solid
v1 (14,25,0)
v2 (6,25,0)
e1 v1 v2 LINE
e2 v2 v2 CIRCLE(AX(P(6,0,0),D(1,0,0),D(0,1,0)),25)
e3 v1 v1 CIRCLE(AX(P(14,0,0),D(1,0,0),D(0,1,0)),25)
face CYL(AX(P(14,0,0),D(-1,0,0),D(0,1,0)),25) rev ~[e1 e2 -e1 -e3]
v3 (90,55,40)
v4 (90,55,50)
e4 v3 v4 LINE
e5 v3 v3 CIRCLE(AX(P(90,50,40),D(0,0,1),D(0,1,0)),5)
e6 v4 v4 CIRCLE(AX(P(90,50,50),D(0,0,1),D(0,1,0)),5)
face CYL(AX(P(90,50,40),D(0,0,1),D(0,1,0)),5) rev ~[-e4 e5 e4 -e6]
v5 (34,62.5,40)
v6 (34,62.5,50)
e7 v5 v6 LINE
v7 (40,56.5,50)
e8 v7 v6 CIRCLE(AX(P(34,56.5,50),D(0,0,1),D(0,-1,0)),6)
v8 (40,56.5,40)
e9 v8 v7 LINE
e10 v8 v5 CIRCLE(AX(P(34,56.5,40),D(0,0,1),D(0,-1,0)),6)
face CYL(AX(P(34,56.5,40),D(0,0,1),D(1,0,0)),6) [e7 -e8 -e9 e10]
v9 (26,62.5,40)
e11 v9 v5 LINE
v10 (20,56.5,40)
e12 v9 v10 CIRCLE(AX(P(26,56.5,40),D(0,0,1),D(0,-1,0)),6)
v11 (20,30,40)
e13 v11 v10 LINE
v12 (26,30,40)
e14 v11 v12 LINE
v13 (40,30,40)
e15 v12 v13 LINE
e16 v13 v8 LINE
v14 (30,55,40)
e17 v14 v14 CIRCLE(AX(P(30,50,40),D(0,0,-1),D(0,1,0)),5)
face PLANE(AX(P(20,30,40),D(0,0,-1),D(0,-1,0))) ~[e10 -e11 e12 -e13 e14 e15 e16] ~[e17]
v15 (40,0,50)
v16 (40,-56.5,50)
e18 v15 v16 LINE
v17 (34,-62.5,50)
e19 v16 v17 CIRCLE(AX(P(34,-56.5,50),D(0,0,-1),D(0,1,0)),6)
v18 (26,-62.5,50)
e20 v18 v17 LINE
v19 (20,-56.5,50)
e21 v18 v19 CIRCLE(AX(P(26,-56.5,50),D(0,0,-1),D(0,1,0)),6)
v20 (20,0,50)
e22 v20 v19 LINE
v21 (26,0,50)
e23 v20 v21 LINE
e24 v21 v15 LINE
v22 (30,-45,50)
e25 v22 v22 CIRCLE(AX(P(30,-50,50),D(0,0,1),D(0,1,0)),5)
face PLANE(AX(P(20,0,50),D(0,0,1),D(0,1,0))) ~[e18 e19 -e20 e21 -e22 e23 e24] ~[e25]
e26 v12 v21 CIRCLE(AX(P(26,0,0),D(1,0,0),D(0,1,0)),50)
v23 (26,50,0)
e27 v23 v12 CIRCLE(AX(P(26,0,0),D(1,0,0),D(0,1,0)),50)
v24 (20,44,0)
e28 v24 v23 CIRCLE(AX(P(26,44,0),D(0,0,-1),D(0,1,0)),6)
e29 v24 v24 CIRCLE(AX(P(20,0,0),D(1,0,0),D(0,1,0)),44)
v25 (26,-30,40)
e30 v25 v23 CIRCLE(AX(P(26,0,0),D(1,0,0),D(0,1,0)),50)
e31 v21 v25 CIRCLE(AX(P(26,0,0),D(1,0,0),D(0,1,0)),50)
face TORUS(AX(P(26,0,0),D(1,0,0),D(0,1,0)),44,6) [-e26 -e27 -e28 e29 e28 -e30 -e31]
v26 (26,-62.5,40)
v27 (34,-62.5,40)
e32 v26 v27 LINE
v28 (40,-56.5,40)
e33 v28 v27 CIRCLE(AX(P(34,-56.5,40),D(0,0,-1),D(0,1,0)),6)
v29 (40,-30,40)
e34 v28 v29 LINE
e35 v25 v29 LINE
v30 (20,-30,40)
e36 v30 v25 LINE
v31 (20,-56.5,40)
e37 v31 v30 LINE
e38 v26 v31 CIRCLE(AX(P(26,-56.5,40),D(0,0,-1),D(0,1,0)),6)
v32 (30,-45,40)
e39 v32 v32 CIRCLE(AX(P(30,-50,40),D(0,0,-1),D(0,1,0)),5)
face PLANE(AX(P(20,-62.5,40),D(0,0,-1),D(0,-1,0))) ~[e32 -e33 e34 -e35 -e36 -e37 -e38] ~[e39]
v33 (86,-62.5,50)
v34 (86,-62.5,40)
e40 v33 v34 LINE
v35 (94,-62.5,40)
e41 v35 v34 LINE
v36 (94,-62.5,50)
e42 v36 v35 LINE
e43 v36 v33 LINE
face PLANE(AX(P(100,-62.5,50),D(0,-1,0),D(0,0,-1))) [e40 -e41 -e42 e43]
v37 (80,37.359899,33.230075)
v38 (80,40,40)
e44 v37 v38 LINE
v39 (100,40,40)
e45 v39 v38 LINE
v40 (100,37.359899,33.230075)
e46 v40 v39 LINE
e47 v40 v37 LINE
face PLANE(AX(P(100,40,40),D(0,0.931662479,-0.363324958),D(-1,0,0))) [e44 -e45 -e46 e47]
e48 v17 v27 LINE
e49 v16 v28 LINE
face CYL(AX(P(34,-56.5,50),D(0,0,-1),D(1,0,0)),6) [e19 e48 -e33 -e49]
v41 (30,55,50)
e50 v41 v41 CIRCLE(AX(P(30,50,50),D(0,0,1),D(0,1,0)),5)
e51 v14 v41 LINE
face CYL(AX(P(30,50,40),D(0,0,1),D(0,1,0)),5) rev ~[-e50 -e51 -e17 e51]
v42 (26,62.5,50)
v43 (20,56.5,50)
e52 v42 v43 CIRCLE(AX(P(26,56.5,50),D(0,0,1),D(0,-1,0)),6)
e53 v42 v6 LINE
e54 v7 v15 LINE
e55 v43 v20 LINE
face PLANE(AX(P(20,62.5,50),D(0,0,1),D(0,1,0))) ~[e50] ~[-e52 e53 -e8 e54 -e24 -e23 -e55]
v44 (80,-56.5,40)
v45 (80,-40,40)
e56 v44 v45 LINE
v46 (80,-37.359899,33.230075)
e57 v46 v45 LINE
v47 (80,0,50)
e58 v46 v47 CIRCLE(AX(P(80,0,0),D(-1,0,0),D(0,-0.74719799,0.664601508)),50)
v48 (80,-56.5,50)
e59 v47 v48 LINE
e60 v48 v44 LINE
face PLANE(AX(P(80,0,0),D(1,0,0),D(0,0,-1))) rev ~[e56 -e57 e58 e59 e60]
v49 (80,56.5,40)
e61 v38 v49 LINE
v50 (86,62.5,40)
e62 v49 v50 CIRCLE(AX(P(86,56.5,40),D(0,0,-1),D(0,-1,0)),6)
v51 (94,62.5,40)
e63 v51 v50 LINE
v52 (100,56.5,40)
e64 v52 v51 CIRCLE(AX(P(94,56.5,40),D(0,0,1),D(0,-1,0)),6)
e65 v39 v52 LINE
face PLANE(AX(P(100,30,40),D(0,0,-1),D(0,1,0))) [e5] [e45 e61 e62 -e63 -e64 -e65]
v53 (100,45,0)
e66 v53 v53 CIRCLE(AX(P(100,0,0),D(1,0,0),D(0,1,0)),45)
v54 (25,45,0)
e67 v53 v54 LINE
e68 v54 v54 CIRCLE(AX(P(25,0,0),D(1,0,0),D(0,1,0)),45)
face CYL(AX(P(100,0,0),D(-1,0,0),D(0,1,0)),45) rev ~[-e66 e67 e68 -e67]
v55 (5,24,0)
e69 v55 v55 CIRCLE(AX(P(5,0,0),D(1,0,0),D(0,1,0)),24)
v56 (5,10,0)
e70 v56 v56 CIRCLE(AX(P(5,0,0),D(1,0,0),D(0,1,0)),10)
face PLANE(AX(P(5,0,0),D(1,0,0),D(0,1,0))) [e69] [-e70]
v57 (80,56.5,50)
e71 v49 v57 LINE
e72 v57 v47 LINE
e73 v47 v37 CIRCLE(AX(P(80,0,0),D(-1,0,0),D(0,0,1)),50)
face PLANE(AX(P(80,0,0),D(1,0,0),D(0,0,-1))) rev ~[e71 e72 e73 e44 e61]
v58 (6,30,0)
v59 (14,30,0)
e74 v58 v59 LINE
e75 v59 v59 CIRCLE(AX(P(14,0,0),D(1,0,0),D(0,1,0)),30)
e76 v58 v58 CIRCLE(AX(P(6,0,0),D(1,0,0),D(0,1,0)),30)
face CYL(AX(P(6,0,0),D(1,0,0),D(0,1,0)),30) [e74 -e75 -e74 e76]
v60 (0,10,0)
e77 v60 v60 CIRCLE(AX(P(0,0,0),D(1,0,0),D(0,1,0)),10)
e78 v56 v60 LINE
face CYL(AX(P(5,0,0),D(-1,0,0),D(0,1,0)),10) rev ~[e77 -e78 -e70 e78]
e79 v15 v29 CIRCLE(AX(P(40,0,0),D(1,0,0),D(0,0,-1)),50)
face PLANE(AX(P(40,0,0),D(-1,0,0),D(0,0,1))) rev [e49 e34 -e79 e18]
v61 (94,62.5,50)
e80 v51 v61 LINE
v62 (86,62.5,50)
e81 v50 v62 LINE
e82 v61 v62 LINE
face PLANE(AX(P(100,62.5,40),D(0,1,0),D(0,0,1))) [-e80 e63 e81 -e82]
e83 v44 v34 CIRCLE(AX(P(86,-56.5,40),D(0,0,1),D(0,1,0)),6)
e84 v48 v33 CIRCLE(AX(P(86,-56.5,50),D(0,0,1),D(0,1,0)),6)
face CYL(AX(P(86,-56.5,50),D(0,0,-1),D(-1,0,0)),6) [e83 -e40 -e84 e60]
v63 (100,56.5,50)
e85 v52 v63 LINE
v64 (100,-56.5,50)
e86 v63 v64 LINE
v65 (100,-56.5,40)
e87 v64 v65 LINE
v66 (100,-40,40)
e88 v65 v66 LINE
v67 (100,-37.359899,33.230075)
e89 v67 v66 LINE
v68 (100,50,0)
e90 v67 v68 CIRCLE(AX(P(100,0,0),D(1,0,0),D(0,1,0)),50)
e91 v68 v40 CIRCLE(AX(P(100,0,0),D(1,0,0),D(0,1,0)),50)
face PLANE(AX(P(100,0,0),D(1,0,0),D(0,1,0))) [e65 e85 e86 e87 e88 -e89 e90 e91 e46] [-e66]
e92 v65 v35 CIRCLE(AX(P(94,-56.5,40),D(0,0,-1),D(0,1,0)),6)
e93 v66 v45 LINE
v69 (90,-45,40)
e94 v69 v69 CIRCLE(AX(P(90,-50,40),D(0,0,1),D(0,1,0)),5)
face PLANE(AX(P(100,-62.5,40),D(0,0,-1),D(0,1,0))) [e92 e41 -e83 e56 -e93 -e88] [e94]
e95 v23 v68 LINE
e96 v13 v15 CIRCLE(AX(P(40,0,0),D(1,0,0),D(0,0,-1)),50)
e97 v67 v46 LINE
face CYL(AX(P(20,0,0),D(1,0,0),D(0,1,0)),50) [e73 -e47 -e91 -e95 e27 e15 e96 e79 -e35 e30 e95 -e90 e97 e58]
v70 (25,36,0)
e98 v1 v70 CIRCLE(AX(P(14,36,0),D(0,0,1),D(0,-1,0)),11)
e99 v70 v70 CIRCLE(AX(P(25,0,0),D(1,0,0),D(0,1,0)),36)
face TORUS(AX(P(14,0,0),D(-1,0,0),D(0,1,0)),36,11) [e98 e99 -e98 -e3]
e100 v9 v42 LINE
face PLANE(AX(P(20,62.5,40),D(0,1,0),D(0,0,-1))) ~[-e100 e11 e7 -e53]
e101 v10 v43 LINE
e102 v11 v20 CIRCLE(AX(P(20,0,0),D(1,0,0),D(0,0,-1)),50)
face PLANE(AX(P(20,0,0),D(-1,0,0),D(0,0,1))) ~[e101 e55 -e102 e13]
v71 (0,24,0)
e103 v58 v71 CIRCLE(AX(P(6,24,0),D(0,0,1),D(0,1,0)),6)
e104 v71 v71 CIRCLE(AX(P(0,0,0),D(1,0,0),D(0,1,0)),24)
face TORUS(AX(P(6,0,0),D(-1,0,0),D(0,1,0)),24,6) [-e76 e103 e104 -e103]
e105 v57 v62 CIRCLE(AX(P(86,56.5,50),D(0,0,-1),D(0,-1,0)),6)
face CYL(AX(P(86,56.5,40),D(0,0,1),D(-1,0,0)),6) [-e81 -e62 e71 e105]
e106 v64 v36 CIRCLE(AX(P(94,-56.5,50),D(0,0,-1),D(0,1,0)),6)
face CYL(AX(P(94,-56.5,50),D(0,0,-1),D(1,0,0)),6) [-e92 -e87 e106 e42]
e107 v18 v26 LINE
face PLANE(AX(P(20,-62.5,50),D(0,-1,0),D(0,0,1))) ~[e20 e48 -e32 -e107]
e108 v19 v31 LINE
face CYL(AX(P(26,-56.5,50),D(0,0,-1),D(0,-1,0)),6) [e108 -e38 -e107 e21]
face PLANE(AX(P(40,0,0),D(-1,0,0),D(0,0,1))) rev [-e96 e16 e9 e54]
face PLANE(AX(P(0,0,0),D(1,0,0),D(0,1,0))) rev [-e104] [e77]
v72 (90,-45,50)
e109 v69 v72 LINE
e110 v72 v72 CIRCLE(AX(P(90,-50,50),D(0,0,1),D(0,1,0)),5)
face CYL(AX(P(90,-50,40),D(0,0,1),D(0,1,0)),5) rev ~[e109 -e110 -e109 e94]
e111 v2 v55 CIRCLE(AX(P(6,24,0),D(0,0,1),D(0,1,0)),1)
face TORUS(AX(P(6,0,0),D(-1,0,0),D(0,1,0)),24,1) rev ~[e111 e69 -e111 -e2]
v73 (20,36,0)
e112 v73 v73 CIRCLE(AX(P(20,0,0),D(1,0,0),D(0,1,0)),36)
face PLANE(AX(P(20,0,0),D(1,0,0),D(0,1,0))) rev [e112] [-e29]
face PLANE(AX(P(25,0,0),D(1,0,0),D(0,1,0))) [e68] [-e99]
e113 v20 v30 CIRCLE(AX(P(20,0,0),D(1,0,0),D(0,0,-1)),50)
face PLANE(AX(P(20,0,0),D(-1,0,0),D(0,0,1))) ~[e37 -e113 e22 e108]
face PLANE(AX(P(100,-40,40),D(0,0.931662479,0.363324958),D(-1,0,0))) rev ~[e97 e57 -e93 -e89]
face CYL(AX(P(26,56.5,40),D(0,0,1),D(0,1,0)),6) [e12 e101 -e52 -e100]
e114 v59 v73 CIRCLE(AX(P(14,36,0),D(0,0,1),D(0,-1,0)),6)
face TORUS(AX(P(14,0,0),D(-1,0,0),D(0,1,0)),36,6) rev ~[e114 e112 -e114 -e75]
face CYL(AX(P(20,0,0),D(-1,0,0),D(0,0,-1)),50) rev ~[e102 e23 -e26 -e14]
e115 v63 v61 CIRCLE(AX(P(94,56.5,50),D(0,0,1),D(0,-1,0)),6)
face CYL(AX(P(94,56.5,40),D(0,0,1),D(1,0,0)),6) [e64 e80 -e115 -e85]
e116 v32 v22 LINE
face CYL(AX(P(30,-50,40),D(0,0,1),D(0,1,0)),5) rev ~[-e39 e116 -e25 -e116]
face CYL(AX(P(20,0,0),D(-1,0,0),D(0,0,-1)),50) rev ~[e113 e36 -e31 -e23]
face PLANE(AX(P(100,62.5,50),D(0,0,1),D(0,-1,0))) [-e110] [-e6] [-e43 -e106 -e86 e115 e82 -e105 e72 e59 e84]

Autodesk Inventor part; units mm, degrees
ref_plane "YZ Plane" through (0, 0, 0) normal (1, 0, 0) x (0, 1, 0)
ref_plane "XZ Plane" through (0, 0, 0) normal (0, 1, 0) x (-1, 0, 0)
sketch "Sketch1" plane through (0, 0, 0) normal (0, 0, 1) x (1, 0, 0)
  line L0 (0, 0) -> (22.5769, 0) construction
  line L1 (0, 10) -> (0, 24)
  line L2 (6, 30) -> (14, 30)
  line L3 (20, 36) -> (20, 50)
  line L4 (20, 50) -> (100, 50)
  arc A0 (6, 30) -> (0, 24) centre (6, 24) ccw
  arc A1 (14, 30) -> (20, 36) centre (14, 36) ccw
  line L5 (100, 45) -> (25, 45)
  line L6 (25, 45) -> (25, 36)
  arc A2 (14, 25) -> (25, 36) centre (14, 36) ccw
  line L7 (14, 25) -> (6, 25)
  arc A3 (6, 25) -> (5, 24) centre (6, 24) ccw
  line L8 (5, 24) -> (5, 10)
  line L9 (100, 50) -> (100, 45)
  line L10 (5, 10) -> (0, 10)
  point P0 (20, 30)
  point P1 (0, 17)
  point P2 (20, 43)
  dimension "d0" = 10
  dimension "d1" = 20
  dimension "d2" = 80
  dimension "d3" = 30
  dimension "d4" = 50
  dimension "d5" = 6
  dimension "d6" = 5
revolve "Revolution1" add sketch "Sketch1" angle 360 about axis through (0, 0, 0) along (1, 0, 0)
fillet "Fillet1" radius 6 1 edges at (20, -50, 0)
sketch "Sketch2" plane through (100, 0, 0) normal (1, 0, 0) x (0, 0, -1)
  line L0 (-40, 62.5) -> (-50, 62.5)
  line L1 (-50, 62.5) -> (-50, -62.5)
  line L2 (-50, -62.5) -> (-40, -62.5)
  circle A0 centre (0, 0) radius 50 projected
  line L3 (-40, -62.5) -> (-40, -30)
  line L4 (-40, 30) -> (-40, 62.5)
  point P0 (-45, -62.5)
  point P1 (-50, 0)
  dimension "d9" = 10
  dimension "d10" = 125
  dimension "d11" = 62.5
extrude "Extrusion1" add sketch "Sketch2" against normal blind 20 contours L4 A0 L1 L0 | A0 L3 L2 L1
chamfer "Chamfer1" distance 10 angle 45 2 edges at (90, -30, 40) (90, 30, 40)
fillet "Fillet3" radius 6 4 edges at (100, 62.5, 45) (100, -62.5, 45) (80, -62.5, 45) (80, 62.5, 45)
sketch "Sketch3" plane through (100, -40, 40) normal (0, 0, -1) x (-1, 0, 0)
  line L0 (20, 0) -> (20, -16.5) projected
  line L1 (0, 0) -> (20, 0) projected
  line L2 (20, 96.5) -> (20, 80) projected
  line L3 (20, 80) -> (0, 80) projected
  point P0 (100, 40)
  point P1 (10, -10)
  point P2 (10, 90)
  dimension "d19" = 10
  dimension "d20" = 10
  dimension "d21" = 10
  dimension "d22" = 10
hole "Hole1" at (90, -50, 40) at (90, 50, 40) direction (0, 0, 1) diameter 10 end through all
ref_plane "Work Plane1" through (60, 0, 0) normal (-1, 0, 0) x (0, 0, 1)
mirror "Mirror1" about plane through (60, 0, 0) normal (-1, 0, 0) of "Hole1", "Extrusion1", "Fillet3"
properties part number "Motor"
